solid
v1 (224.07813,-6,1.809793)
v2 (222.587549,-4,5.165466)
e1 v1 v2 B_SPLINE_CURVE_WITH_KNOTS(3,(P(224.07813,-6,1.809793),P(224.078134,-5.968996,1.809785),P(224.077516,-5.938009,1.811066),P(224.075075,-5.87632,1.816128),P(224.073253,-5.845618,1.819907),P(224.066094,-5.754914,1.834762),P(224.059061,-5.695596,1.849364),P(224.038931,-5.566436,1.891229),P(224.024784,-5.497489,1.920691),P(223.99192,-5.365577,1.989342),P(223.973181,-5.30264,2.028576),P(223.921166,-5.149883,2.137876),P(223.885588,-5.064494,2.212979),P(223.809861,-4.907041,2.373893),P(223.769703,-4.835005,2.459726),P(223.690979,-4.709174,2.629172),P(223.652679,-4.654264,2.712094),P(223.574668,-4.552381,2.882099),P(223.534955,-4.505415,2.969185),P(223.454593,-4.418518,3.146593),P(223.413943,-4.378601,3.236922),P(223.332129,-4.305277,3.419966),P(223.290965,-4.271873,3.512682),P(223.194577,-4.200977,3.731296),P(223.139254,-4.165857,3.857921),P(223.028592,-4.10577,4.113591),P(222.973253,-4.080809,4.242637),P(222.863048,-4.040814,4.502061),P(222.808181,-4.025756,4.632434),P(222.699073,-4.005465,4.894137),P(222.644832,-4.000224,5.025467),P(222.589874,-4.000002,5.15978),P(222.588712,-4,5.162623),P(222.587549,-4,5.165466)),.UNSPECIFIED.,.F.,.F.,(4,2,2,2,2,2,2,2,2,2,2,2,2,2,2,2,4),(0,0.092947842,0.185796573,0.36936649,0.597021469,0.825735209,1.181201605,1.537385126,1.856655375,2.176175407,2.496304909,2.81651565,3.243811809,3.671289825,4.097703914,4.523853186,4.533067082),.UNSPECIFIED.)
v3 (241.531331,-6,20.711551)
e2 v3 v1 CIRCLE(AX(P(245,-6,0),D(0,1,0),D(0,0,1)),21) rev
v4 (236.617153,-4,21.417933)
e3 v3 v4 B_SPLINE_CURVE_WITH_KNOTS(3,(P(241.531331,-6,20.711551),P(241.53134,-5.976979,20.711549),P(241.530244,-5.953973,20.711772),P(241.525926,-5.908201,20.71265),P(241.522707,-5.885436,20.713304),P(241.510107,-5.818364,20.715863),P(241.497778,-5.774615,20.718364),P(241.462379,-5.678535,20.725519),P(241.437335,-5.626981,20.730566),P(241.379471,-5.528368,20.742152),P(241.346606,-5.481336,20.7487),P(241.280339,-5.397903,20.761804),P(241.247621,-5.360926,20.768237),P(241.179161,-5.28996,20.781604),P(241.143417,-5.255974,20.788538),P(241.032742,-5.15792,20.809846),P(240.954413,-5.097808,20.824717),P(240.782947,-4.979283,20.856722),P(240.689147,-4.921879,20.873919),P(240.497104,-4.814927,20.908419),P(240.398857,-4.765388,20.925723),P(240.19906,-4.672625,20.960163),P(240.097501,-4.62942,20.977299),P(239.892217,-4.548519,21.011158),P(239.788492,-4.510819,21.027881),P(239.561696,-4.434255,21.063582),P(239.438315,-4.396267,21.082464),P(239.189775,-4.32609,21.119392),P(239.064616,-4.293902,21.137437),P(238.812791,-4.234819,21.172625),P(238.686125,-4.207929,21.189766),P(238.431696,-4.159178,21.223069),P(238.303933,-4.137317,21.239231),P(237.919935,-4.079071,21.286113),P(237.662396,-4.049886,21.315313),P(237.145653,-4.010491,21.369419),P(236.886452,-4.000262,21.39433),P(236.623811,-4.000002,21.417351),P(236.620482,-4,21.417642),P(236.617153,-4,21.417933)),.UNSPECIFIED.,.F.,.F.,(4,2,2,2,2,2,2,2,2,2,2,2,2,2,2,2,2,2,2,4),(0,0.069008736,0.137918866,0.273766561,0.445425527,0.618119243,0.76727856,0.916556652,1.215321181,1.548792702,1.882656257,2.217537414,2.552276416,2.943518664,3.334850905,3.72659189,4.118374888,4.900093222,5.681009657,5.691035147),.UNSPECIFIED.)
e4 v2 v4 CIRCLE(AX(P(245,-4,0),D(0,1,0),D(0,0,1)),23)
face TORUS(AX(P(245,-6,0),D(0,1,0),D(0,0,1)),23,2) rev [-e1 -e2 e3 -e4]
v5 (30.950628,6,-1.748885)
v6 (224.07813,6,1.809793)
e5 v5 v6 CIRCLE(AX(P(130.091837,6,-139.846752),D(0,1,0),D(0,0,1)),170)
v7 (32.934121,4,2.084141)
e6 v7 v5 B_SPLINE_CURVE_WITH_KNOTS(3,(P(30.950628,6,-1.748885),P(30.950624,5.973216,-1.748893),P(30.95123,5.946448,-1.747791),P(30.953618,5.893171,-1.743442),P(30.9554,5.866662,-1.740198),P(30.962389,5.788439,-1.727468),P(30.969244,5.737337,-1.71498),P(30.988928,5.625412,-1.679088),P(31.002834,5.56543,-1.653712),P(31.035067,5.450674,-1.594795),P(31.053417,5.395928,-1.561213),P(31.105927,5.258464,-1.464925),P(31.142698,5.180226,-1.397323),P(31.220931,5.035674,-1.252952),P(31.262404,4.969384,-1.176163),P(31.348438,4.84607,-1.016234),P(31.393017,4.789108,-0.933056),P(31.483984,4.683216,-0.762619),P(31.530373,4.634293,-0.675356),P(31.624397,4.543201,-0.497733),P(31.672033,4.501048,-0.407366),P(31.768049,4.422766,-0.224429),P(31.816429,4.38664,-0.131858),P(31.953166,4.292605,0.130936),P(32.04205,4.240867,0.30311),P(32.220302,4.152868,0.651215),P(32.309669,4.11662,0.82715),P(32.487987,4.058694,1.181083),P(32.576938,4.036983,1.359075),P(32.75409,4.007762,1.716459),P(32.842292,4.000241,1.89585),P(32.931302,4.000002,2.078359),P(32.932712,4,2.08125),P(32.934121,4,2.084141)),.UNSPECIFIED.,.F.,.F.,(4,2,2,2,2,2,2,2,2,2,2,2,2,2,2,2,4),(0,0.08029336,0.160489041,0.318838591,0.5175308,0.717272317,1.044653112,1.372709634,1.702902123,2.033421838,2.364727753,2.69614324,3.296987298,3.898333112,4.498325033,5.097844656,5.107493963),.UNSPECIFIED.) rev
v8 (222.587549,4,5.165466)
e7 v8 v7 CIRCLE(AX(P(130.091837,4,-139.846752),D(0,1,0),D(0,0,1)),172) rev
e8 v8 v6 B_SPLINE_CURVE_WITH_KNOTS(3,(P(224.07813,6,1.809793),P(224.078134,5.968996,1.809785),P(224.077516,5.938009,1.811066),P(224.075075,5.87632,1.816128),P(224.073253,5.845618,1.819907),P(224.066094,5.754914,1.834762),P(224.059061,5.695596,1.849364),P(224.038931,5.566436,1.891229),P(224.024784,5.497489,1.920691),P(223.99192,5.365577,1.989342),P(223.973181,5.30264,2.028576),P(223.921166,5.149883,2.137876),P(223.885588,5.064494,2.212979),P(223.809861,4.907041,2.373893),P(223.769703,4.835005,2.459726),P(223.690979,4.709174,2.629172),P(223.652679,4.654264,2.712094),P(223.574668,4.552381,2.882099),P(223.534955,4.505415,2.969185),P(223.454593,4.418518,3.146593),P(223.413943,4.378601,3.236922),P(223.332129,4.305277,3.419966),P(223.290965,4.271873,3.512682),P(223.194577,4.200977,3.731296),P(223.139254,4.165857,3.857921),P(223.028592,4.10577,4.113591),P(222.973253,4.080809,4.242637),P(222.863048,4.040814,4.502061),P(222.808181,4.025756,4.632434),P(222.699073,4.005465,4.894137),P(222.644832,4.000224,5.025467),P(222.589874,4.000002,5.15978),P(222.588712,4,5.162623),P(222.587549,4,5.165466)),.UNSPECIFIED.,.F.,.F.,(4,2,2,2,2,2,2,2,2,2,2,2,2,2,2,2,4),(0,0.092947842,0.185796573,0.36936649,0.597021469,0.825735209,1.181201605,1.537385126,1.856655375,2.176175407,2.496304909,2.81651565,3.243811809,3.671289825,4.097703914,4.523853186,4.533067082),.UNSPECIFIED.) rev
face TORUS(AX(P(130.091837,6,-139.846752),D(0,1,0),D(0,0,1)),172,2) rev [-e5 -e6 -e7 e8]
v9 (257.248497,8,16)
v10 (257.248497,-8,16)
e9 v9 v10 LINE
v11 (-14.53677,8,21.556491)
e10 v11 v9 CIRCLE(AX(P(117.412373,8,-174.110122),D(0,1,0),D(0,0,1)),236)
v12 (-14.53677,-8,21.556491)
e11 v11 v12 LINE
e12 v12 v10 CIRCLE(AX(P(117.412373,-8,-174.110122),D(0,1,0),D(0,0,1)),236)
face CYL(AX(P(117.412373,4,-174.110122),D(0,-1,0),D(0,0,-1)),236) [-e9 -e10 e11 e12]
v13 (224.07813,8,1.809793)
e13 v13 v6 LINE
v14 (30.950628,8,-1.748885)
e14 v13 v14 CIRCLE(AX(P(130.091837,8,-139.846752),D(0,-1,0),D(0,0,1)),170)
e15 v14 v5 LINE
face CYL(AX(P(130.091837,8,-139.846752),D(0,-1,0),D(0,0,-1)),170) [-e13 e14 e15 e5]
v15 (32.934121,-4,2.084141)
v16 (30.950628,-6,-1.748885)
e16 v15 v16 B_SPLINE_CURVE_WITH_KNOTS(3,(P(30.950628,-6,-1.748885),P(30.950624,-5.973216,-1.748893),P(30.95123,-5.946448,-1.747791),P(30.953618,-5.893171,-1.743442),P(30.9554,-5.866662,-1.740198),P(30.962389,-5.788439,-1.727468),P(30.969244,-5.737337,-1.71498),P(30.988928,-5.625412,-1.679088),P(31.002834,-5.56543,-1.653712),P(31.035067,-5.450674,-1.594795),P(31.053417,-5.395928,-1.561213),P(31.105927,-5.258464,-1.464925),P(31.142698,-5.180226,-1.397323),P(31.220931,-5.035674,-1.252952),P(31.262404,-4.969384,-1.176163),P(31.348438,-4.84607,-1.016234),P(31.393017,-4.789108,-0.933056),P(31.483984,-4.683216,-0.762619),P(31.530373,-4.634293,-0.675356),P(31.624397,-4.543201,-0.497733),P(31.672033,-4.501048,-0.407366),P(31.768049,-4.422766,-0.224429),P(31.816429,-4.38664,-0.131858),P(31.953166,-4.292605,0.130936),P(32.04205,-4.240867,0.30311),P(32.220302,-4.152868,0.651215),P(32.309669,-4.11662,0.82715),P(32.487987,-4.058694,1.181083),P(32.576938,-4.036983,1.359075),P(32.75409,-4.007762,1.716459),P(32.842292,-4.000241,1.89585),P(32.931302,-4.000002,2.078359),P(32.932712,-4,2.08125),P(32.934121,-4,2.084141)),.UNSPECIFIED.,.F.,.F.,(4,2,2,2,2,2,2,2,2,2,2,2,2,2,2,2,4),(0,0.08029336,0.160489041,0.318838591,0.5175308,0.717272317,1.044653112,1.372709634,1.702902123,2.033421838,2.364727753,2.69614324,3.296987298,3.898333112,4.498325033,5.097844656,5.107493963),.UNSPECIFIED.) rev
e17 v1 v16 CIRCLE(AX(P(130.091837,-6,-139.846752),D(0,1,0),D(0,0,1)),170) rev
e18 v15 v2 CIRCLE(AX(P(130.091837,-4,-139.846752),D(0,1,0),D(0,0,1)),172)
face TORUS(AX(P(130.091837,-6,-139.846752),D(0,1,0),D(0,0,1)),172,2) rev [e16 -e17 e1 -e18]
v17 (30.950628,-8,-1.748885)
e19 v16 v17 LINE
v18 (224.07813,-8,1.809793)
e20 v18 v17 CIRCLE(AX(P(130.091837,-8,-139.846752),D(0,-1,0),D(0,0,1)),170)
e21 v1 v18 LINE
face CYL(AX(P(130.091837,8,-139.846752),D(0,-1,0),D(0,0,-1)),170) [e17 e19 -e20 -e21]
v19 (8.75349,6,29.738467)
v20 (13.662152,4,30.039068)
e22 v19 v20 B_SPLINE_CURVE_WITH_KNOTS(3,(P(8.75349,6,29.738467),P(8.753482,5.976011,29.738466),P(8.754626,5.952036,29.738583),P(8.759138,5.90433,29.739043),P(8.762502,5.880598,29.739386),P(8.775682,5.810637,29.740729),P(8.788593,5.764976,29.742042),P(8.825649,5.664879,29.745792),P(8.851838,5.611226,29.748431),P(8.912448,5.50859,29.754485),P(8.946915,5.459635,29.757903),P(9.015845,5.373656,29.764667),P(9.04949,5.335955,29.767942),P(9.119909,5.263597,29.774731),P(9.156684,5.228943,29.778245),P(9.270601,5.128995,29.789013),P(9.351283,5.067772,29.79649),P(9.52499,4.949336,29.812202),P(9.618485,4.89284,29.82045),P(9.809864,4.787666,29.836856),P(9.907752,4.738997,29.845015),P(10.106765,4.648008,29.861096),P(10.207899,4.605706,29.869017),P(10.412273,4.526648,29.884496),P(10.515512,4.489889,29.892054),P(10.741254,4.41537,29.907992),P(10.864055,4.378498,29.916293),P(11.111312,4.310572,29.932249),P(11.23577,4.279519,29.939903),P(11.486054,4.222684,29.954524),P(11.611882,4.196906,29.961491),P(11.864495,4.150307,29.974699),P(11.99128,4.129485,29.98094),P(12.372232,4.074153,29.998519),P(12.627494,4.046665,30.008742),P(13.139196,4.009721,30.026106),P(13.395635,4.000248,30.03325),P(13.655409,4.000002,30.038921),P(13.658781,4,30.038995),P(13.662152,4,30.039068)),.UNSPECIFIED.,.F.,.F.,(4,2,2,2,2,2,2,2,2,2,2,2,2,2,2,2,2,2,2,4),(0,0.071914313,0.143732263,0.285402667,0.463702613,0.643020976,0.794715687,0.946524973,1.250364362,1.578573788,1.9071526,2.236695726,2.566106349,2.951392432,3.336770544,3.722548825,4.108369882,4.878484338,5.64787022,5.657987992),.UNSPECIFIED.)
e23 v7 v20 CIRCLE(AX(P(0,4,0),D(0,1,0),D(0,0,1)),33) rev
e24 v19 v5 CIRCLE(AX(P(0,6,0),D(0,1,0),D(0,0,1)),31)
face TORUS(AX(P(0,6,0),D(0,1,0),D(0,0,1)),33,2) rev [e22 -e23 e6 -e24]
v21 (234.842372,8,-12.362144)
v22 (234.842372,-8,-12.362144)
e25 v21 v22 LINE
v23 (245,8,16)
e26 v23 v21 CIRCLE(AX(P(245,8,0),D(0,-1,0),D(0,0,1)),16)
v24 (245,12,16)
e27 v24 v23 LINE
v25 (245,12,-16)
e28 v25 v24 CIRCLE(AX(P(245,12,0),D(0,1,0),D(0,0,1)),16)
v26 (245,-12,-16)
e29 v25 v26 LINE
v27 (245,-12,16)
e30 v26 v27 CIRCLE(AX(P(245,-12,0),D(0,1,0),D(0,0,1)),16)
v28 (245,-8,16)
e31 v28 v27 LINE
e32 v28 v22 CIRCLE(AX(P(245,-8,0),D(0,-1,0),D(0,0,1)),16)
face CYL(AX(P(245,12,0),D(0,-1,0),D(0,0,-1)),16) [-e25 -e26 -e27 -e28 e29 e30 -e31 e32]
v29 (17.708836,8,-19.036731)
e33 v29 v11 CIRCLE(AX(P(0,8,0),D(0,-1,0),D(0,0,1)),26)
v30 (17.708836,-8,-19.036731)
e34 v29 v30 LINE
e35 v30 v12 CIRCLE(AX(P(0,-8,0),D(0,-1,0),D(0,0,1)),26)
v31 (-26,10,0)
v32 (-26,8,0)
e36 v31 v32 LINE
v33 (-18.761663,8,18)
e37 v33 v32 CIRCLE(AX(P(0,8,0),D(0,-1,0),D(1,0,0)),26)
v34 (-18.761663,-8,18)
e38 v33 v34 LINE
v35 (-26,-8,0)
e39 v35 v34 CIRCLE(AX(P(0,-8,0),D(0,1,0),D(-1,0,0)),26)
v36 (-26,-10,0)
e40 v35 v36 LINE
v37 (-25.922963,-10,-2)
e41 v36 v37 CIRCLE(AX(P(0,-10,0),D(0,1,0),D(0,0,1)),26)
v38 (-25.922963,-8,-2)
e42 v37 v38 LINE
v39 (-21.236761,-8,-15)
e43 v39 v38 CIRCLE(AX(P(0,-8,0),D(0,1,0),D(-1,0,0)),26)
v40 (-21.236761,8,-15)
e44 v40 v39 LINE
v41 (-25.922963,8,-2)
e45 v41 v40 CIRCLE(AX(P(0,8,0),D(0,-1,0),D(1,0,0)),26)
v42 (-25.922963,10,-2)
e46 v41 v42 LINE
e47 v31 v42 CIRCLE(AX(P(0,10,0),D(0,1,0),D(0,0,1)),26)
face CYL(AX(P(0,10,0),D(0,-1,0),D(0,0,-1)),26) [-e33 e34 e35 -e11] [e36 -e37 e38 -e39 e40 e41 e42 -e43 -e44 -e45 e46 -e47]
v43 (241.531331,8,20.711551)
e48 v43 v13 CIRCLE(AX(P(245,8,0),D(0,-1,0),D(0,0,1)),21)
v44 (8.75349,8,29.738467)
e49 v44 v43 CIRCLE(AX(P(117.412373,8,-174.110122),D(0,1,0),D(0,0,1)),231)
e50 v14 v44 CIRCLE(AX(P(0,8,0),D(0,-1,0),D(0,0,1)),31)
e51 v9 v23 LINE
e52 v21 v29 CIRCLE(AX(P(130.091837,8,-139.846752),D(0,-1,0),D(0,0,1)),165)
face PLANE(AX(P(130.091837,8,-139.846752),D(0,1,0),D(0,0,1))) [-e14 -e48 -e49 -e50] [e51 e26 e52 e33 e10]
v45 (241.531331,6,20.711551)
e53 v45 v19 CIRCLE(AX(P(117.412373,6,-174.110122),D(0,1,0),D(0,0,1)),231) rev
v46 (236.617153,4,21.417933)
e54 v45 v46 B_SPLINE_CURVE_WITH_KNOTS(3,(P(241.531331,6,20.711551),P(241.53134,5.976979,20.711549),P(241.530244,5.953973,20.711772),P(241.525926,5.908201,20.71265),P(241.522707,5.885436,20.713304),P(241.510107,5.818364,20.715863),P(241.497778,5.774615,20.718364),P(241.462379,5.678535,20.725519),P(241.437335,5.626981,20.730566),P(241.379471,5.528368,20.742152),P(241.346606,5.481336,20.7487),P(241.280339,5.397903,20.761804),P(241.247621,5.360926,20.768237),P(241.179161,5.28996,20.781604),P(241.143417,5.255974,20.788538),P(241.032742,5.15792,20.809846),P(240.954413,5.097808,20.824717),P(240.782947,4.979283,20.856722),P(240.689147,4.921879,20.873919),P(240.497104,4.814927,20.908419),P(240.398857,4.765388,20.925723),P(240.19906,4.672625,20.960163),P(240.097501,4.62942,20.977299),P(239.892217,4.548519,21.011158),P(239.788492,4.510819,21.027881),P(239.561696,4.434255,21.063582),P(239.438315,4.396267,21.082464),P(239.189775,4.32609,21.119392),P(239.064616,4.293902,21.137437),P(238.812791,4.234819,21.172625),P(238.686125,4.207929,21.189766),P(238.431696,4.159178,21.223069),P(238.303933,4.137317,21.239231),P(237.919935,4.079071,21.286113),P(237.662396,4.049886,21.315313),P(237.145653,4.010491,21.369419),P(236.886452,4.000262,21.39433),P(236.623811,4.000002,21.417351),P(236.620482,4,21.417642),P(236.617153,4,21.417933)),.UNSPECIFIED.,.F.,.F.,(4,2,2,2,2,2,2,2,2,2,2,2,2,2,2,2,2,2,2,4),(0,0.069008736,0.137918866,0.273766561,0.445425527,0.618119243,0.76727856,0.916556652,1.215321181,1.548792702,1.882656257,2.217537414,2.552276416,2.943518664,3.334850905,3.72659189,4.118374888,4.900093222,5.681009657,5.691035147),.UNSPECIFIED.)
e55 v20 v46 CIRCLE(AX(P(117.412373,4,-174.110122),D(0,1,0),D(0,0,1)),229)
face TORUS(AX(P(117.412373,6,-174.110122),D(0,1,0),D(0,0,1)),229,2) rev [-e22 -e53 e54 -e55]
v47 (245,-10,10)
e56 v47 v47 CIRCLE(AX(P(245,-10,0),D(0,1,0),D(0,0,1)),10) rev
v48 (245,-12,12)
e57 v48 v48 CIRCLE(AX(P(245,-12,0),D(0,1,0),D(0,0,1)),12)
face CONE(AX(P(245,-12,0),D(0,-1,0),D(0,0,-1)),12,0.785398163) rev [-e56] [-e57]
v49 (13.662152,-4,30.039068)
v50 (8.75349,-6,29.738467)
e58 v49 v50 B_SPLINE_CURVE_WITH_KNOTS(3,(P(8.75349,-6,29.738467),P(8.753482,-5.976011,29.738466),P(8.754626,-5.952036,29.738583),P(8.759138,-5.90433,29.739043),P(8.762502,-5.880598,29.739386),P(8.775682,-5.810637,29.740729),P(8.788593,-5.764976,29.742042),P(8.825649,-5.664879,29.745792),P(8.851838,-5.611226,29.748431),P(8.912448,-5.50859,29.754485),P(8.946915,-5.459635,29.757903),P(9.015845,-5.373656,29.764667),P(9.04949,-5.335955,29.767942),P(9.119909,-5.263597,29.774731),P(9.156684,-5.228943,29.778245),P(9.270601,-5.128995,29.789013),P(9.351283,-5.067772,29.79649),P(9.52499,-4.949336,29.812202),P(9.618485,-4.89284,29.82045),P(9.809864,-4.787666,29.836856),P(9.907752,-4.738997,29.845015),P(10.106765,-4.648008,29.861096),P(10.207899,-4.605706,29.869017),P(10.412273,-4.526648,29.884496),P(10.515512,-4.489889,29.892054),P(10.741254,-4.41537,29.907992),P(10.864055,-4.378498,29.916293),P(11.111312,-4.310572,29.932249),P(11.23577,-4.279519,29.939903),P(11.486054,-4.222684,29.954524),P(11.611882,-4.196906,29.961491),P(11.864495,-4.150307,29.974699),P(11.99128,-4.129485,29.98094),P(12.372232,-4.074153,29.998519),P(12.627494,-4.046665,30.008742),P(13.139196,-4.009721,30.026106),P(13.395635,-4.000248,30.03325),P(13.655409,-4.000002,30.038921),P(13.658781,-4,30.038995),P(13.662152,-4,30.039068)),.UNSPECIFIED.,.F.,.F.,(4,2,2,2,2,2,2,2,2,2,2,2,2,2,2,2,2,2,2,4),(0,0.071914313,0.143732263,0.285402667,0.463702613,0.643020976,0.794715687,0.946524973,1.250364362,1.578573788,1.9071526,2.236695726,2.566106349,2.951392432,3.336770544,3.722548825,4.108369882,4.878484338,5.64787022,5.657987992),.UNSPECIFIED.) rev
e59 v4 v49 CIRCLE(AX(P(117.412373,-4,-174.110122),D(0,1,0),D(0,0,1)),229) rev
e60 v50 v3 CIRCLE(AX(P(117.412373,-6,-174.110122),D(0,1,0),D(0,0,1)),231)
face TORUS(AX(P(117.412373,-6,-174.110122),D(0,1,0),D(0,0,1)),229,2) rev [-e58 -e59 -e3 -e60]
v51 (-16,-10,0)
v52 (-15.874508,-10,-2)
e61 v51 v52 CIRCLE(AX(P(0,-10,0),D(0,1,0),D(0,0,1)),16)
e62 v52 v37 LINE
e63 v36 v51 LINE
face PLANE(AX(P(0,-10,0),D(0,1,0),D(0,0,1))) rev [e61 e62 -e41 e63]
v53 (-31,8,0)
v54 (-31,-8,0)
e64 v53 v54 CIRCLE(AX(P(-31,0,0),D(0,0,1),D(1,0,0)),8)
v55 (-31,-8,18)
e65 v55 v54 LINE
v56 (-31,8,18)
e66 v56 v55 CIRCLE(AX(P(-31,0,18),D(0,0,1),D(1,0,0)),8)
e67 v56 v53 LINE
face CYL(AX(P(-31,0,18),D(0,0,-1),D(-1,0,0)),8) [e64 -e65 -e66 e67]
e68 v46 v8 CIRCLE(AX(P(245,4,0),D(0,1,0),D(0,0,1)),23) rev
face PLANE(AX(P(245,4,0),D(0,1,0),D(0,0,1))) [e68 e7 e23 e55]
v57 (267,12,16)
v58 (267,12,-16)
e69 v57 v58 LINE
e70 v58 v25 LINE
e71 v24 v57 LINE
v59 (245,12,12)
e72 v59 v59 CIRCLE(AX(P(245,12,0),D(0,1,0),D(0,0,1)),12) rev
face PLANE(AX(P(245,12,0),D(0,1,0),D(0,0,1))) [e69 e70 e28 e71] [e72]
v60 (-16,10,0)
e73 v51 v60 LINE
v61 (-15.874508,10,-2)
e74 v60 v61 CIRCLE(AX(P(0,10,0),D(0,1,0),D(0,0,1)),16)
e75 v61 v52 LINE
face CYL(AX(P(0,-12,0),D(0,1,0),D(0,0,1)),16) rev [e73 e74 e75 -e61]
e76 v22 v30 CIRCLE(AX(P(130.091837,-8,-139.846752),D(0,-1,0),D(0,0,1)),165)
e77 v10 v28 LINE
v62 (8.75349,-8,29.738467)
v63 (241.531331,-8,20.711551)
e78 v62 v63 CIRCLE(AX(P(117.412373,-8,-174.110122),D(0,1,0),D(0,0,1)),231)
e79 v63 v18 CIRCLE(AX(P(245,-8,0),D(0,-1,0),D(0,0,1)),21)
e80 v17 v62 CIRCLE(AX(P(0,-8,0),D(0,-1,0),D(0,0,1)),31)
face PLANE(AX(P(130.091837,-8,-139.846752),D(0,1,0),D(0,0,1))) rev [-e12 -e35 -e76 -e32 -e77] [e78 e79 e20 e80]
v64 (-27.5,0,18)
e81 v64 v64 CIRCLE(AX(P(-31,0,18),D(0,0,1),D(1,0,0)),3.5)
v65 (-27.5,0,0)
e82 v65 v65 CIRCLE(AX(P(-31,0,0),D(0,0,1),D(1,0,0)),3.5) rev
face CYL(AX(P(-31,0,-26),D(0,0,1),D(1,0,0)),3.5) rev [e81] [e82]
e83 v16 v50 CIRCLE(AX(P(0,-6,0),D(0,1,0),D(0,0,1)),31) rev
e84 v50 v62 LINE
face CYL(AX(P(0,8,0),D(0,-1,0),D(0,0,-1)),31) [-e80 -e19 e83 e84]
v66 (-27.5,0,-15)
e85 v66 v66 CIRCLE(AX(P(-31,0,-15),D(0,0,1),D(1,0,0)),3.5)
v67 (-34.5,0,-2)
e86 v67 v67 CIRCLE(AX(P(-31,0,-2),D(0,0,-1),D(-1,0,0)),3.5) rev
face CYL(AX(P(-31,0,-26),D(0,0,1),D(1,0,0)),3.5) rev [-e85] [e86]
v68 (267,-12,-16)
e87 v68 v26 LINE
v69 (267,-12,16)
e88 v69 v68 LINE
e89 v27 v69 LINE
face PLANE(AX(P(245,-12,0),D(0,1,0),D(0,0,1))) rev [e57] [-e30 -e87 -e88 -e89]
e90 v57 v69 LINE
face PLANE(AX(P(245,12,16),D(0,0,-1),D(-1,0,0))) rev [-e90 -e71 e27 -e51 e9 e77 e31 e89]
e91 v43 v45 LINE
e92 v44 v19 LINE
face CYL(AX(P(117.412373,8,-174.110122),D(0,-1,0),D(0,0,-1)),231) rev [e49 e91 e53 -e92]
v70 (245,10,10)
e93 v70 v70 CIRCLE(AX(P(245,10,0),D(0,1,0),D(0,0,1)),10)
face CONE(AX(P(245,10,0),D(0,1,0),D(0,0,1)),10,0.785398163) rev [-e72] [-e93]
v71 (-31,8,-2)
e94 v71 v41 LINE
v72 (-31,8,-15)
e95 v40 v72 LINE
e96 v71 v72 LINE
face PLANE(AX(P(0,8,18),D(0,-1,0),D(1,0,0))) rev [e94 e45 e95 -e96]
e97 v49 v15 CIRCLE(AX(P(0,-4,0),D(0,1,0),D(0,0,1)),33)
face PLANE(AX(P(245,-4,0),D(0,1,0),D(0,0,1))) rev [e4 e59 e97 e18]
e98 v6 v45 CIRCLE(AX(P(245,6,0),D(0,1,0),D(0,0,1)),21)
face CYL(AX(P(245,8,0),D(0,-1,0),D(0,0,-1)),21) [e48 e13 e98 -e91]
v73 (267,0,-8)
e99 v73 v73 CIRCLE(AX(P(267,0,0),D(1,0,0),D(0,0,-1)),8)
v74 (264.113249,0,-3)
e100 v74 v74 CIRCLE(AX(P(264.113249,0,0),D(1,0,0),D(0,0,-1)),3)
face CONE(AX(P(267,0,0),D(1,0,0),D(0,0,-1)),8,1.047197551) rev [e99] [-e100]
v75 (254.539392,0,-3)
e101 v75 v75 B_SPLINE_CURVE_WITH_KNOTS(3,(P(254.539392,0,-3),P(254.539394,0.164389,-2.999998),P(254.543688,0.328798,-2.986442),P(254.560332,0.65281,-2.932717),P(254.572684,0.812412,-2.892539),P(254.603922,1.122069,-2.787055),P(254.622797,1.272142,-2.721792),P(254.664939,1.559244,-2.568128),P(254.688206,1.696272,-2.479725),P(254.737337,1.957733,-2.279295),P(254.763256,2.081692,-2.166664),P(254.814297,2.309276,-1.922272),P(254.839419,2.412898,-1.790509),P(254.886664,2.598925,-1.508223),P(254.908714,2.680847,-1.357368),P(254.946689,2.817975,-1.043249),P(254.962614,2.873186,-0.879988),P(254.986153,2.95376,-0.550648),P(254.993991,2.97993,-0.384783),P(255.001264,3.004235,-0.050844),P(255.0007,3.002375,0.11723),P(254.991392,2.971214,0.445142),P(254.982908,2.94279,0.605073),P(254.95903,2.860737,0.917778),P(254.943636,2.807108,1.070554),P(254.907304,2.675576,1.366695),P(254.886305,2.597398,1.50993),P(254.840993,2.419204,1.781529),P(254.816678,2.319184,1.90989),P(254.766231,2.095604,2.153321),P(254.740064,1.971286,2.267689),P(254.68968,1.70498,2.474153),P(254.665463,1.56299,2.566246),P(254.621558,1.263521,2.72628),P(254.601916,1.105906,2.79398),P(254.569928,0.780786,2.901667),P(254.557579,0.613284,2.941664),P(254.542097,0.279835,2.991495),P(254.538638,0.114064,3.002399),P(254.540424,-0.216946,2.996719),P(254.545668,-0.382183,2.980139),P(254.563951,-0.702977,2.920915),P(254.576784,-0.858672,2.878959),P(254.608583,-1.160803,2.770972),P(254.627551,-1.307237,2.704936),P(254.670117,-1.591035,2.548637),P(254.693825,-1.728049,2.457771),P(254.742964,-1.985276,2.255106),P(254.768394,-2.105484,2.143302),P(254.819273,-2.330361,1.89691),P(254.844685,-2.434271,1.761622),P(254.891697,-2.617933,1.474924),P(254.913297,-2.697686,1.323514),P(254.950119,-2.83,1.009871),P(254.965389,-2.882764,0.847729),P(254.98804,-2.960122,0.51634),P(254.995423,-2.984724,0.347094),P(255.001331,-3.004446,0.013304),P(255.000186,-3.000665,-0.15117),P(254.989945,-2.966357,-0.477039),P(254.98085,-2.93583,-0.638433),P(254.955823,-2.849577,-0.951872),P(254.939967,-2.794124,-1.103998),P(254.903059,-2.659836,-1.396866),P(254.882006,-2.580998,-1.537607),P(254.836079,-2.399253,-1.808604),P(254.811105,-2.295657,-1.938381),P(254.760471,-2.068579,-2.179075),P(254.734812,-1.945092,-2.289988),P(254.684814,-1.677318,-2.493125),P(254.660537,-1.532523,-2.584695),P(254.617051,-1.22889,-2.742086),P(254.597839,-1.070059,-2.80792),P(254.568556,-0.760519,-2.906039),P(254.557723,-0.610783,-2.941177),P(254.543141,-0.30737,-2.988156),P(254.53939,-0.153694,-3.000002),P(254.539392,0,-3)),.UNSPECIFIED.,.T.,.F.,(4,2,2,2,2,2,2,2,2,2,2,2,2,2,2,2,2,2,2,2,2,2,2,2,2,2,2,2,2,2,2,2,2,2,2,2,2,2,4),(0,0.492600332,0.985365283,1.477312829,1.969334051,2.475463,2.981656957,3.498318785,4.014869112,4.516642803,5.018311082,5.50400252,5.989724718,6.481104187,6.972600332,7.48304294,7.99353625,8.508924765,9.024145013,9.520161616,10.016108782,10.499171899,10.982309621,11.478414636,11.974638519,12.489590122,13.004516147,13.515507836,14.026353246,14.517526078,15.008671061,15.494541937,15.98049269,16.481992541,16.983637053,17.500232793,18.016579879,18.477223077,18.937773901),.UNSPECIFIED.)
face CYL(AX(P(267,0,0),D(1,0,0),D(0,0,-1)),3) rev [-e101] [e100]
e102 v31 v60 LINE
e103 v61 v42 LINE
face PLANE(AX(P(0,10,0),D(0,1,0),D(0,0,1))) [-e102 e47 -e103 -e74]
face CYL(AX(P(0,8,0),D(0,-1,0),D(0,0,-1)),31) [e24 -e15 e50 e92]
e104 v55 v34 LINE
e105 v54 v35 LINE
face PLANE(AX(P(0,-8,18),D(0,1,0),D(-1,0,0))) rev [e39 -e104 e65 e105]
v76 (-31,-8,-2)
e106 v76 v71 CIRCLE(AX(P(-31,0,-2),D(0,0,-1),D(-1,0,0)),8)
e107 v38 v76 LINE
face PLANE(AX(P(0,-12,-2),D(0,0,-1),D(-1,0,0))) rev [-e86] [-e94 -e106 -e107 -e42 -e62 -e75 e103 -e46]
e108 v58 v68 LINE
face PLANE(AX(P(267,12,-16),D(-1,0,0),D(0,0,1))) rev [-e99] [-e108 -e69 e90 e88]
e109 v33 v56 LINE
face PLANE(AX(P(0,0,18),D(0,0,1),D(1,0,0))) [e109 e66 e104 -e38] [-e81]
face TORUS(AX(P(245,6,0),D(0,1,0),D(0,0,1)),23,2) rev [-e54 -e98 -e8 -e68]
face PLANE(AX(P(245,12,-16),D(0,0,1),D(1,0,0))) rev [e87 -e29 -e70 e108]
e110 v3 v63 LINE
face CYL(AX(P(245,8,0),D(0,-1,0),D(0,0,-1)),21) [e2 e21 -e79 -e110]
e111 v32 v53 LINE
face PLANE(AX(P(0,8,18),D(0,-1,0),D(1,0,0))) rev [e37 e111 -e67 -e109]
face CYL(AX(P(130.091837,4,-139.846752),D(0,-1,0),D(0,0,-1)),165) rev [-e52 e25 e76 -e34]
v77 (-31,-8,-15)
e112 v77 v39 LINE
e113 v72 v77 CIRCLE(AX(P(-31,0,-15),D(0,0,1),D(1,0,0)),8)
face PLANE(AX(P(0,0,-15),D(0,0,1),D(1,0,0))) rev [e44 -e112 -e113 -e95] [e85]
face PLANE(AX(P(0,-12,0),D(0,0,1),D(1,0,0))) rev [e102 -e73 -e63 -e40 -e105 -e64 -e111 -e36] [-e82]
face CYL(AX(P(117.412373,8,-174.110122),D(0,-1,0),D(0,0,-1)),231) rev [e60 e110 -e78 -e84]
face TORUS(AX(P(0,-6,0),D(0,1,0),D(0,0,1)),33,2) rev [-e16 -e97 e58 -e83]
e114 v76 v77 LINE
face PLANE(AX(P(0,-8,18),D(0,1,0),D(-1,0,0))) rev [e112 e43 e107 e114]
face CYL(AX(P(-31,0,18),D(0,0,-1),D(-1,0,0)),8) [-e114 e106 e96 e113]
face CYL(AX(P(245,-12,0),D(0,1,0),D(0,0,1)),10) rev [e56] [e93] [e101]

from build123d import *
from build123d.topology import SkipClean

# Parameters (mm, degrees)
SKETCH_1_R               = 26
EXTRUDE_1_DEPTH          = 10
EXTRUDE_2_DEPTH          = 12
EXTRUDE_3_DEPTH          = 4
EXTRUDE_4_DEPTH          = 8
EXTRUDE_START            = -15
EXTRUDE_5_DEPTH          = 33
SKETCH_6_R               = 3.5
CUT_EXTRUDE_1_DEPTH      = 271.867126097
SKETCH_7_R               = 16
CUT_EXTRUDE_2_DEPTH      = 275.960646248
CUT_EXTRUDE_3_DEPTH      = 275.341679271
CUT_EXTRUDE_3_DEPTH_BACK = 275.341679271
SKETCH_8_W               = 47.47924493
SKETCH_8_H               = 2
SKETCH_9_R               = 10
CUT_EXTRUDE_4_DEPTH      = 276.127892052
CHAMFER_1_SIZE           = 2
FILLET_1_R               = 2


# Read off the part's stored shape, not the designer's step: Ø6.0mm 暗销孔1
with BuildPart() as part:
    # 草图1 → 凸台-拉伸1 (new, symmetric)
    with BuildSketch(Plane(origin=(0, 0, 0), x_dir=(1, 0, 0), z_dir=(0, 1, 0))):
        with Locations(Location((0, 0, 0), (0, 0, 270))):
            Circle(SKETCH_1_R)
    extrude(amount=EXTRUDE_1_DEPTH, both=True)



with BuildPart() as body_2:
    # 草图2 → 凸台-拉伸2 (new, symmetric)
    with BuildSketch(Plane(origin=(0, 0, 0), x_dir=(1, 0, 0), z_dir=(0, 1, 0))):
        with BuildLine():
            Line((245, 16), (267, 16))
            Line((267, 16), (267, -16))
            Line((267, -16), (245, -16))
            ThreePointArc((245, -16), (229, 0), (245, 16))
        make_face()
    extrude(amount=EXTRUDE_2_DEPTH, both=True)


with BuildPart() as part_1:
    add(part.part)

    add(body_2.part)  # 凸台-拉伸3 merges body 2
    # 草图3 → 凸台-拉伸3 (add, symmetric)
    with BuildSketch(Plane(origin=(0, 0, 0), x_dir=(1, 0, 0), z_dir=(0, 1, 0))):
        with BuildLine():
            Line((245, -16), (257.248496817, -16))
            ThreePointArc((257.248496817, -16), (122.236247563, -61.840572391), (-14.536770014, -21.556491309))
            ThreePointArc((-14.536770014, -21.556491309), (20.358485161, -16.17195356), (17.708836414, 19.036730624))
            ThreePointArc((17.708836414, 19.036730624), (125.0222059, -25.075347424), (234.842372308, 12.362143814))
            ThreePointArc((234.842372308, 12.362143814), (229.936894394, -5.394705691), (245, -16))
        make_face()
    extrude(amount=EXTRUDE_3_DEPTH, both=True)

    # 草图4 → 凸台-拉伸4 (add, symmetric)
    with SkipClean():  # the faces are left unmerged after this step: merging them gives an invalid solid
        with BuildSketch(Plane(origin=(0, 0, 0), x_dir=(1, 0, 0), z_dir=(0, 1, 0))):
            with BuildLine():
                Line((257.248496817, -16), (245, -16))
                ThreePointArc((245, -16), (229.936894394, -5.394705691), (234.842372308, 12.362143814))
                ThreePointArc((234.842372308, 12.362143814), (125.0222059, -25.075347424), (17.708836414, 19.036730624))
                ThreePointArc((17.708836414, 19.036730624), (20.358485161, -16.17195356), (-14.536770014, -21.556491309))
                ThreePointArc((-14.536770014, -21.556491309), (122.236247563, -61.840572391), (257.248496817, -16))
            make_face()
            with BuildLine():
                ThreePointArc((224.078129878, -1.809792966), (229.571334836, -14.24627289), (241.531331279, -20.711550818))
                ThreePointArc((241.531331279, -20.711550818), (126.363618071, -56.716382465), (8.753490395, -29.738466771))
                ThreePointArc((8.753490395, -29.738466771), (25.337079445, -17.861478248), (30.950628442, 1.74888508))
                ThreePointArc((30.950628442, 1.74888508), (126.959850958, -30.124394673), (224.078129878, -1.809792966))
            make_face(mode=Mode.SUBTRACT)
        extrude(amount=EXTRUDE_4_DEPTH, both=True)
    add(part_1.part.scale(1), mode=Mode.REPLACE)  # the faces are merged on a copy

    # 草图5 → 凸台-拉伸5 (add)
    with BuildSketch(Plane.XY.offset(EXTRUDE_START)):
        with BuildLine():
            Line((0, -8), (-31, -8))
            ThreePointArc((-31, -8), (-39, 0), (-31, 8))
            Line((-31, 8), (0, 8))
            ThreePointArc((0, 8), (8, 0), (0, -8))
        make_face()
    extrude(amount=EXTRUDE_5_DEPTH)

    # 草图6 → 切除-拉伸1 (cut, through all)
    with BuildSketch(Plane.XY.offset(18)):
        with Locations((-31, 0)):
            Circle(SKETCH_6_R)
    extrude(amount=-CUT_EXTRUDE_1_DEPTH, mode=Mode.SUBTRACT)

    # 草图7 → 切除-拉伸2 (cut, through all)
    with BuildSketch(Plane(origin=(0, 10, 0), x_dir=(1, 0, 0), z_dir=(0, 1, 0))):
        with Locations(Location((0, 0, 0), (0, 0, 270))):
            Circle(SKETCH_7_R)
    extrude(amount=-CUT_EXTRUDE_2_DEPTH, mode=Mode.SUBTRACT)

    # 草图8 → 切除-拉伸3 (cut, two sides: drawn at the far end of the back side and taken through both)
    with BuildSketch(Plane(origin=(0, 0, 0), x_dir=(1, 0, 0), z_dir=(0, 1, 0)).offset(-CUT_EXTRUDE_3_DEPTH_BACK)):
        with Locations((-23.739622465, 1)):
            Rectangle(SKETCH_8_W, SKETCH_8_H)
    extrude(amount=CUT_EXTRUDE_3_DEPTH + CUT_EXTRUDE_3_DEPTH_BACK, mode=Mode.SUBTRACT)

    # 草图9 → 切除-拉伸4 (cut, through all)
    with BuildSketch(Plane(origin=(0, 12, 0), x_dir=(1, 0, 0), z_dir=(0, 1, 0))):
        with Locations(Location((245, 0, 0), (0, 0, 270))):
            Circle(SKETCH_9_R)
    extrude(amount=-CUT_EXTRUDE_4_DEPTH, mode=Mode.SUBTRACT)

    # 倒角1
    chamfer_1_edges = [part_1.edges().sort_by_distance(p)[0] for p in [
        (245, -12, -10),
        (245, 12, -10),
    ]]
    chamfer(chamfer_1_edges, length=CHAMFER_1_SIZE)

    # 圆角1
    fillet_1_edges = [part_1.edges().sort_by_distance(p)[0] for p in [
        (25.337079445, -4, 17.861478248),
        (126.959850958, -4, 30.124394673),
        (229.571334836, -4, 14.24627289),
        (126.363618071, -4, 56.716382465),
        (126.363618071, 4, 56.716382465),
        (229.571334836, 4, 14.24627289),
        (126.959850958, 4, 30.124394673),
        (25.337079445, 4, 17.861478248),
    ]]
    fillet(fillet_1_edges, radius=FILLET_1_R)

    # Ø6.0mm 暗销孔1 outline → Ø6.0mm 暗销孔1 (revolve, cut)
    with BuildSketch(Plane.YX):
        Polygon((0, 254.53912622), (3, 254.53912622), (3, 264.113248654), (8, 267), (0, 267), align=None)
    revolve(axis=Axis((0, 0, 0), (1, 0, 0)), mode=Mode.SUBTRACT)


solid = part_1.part
